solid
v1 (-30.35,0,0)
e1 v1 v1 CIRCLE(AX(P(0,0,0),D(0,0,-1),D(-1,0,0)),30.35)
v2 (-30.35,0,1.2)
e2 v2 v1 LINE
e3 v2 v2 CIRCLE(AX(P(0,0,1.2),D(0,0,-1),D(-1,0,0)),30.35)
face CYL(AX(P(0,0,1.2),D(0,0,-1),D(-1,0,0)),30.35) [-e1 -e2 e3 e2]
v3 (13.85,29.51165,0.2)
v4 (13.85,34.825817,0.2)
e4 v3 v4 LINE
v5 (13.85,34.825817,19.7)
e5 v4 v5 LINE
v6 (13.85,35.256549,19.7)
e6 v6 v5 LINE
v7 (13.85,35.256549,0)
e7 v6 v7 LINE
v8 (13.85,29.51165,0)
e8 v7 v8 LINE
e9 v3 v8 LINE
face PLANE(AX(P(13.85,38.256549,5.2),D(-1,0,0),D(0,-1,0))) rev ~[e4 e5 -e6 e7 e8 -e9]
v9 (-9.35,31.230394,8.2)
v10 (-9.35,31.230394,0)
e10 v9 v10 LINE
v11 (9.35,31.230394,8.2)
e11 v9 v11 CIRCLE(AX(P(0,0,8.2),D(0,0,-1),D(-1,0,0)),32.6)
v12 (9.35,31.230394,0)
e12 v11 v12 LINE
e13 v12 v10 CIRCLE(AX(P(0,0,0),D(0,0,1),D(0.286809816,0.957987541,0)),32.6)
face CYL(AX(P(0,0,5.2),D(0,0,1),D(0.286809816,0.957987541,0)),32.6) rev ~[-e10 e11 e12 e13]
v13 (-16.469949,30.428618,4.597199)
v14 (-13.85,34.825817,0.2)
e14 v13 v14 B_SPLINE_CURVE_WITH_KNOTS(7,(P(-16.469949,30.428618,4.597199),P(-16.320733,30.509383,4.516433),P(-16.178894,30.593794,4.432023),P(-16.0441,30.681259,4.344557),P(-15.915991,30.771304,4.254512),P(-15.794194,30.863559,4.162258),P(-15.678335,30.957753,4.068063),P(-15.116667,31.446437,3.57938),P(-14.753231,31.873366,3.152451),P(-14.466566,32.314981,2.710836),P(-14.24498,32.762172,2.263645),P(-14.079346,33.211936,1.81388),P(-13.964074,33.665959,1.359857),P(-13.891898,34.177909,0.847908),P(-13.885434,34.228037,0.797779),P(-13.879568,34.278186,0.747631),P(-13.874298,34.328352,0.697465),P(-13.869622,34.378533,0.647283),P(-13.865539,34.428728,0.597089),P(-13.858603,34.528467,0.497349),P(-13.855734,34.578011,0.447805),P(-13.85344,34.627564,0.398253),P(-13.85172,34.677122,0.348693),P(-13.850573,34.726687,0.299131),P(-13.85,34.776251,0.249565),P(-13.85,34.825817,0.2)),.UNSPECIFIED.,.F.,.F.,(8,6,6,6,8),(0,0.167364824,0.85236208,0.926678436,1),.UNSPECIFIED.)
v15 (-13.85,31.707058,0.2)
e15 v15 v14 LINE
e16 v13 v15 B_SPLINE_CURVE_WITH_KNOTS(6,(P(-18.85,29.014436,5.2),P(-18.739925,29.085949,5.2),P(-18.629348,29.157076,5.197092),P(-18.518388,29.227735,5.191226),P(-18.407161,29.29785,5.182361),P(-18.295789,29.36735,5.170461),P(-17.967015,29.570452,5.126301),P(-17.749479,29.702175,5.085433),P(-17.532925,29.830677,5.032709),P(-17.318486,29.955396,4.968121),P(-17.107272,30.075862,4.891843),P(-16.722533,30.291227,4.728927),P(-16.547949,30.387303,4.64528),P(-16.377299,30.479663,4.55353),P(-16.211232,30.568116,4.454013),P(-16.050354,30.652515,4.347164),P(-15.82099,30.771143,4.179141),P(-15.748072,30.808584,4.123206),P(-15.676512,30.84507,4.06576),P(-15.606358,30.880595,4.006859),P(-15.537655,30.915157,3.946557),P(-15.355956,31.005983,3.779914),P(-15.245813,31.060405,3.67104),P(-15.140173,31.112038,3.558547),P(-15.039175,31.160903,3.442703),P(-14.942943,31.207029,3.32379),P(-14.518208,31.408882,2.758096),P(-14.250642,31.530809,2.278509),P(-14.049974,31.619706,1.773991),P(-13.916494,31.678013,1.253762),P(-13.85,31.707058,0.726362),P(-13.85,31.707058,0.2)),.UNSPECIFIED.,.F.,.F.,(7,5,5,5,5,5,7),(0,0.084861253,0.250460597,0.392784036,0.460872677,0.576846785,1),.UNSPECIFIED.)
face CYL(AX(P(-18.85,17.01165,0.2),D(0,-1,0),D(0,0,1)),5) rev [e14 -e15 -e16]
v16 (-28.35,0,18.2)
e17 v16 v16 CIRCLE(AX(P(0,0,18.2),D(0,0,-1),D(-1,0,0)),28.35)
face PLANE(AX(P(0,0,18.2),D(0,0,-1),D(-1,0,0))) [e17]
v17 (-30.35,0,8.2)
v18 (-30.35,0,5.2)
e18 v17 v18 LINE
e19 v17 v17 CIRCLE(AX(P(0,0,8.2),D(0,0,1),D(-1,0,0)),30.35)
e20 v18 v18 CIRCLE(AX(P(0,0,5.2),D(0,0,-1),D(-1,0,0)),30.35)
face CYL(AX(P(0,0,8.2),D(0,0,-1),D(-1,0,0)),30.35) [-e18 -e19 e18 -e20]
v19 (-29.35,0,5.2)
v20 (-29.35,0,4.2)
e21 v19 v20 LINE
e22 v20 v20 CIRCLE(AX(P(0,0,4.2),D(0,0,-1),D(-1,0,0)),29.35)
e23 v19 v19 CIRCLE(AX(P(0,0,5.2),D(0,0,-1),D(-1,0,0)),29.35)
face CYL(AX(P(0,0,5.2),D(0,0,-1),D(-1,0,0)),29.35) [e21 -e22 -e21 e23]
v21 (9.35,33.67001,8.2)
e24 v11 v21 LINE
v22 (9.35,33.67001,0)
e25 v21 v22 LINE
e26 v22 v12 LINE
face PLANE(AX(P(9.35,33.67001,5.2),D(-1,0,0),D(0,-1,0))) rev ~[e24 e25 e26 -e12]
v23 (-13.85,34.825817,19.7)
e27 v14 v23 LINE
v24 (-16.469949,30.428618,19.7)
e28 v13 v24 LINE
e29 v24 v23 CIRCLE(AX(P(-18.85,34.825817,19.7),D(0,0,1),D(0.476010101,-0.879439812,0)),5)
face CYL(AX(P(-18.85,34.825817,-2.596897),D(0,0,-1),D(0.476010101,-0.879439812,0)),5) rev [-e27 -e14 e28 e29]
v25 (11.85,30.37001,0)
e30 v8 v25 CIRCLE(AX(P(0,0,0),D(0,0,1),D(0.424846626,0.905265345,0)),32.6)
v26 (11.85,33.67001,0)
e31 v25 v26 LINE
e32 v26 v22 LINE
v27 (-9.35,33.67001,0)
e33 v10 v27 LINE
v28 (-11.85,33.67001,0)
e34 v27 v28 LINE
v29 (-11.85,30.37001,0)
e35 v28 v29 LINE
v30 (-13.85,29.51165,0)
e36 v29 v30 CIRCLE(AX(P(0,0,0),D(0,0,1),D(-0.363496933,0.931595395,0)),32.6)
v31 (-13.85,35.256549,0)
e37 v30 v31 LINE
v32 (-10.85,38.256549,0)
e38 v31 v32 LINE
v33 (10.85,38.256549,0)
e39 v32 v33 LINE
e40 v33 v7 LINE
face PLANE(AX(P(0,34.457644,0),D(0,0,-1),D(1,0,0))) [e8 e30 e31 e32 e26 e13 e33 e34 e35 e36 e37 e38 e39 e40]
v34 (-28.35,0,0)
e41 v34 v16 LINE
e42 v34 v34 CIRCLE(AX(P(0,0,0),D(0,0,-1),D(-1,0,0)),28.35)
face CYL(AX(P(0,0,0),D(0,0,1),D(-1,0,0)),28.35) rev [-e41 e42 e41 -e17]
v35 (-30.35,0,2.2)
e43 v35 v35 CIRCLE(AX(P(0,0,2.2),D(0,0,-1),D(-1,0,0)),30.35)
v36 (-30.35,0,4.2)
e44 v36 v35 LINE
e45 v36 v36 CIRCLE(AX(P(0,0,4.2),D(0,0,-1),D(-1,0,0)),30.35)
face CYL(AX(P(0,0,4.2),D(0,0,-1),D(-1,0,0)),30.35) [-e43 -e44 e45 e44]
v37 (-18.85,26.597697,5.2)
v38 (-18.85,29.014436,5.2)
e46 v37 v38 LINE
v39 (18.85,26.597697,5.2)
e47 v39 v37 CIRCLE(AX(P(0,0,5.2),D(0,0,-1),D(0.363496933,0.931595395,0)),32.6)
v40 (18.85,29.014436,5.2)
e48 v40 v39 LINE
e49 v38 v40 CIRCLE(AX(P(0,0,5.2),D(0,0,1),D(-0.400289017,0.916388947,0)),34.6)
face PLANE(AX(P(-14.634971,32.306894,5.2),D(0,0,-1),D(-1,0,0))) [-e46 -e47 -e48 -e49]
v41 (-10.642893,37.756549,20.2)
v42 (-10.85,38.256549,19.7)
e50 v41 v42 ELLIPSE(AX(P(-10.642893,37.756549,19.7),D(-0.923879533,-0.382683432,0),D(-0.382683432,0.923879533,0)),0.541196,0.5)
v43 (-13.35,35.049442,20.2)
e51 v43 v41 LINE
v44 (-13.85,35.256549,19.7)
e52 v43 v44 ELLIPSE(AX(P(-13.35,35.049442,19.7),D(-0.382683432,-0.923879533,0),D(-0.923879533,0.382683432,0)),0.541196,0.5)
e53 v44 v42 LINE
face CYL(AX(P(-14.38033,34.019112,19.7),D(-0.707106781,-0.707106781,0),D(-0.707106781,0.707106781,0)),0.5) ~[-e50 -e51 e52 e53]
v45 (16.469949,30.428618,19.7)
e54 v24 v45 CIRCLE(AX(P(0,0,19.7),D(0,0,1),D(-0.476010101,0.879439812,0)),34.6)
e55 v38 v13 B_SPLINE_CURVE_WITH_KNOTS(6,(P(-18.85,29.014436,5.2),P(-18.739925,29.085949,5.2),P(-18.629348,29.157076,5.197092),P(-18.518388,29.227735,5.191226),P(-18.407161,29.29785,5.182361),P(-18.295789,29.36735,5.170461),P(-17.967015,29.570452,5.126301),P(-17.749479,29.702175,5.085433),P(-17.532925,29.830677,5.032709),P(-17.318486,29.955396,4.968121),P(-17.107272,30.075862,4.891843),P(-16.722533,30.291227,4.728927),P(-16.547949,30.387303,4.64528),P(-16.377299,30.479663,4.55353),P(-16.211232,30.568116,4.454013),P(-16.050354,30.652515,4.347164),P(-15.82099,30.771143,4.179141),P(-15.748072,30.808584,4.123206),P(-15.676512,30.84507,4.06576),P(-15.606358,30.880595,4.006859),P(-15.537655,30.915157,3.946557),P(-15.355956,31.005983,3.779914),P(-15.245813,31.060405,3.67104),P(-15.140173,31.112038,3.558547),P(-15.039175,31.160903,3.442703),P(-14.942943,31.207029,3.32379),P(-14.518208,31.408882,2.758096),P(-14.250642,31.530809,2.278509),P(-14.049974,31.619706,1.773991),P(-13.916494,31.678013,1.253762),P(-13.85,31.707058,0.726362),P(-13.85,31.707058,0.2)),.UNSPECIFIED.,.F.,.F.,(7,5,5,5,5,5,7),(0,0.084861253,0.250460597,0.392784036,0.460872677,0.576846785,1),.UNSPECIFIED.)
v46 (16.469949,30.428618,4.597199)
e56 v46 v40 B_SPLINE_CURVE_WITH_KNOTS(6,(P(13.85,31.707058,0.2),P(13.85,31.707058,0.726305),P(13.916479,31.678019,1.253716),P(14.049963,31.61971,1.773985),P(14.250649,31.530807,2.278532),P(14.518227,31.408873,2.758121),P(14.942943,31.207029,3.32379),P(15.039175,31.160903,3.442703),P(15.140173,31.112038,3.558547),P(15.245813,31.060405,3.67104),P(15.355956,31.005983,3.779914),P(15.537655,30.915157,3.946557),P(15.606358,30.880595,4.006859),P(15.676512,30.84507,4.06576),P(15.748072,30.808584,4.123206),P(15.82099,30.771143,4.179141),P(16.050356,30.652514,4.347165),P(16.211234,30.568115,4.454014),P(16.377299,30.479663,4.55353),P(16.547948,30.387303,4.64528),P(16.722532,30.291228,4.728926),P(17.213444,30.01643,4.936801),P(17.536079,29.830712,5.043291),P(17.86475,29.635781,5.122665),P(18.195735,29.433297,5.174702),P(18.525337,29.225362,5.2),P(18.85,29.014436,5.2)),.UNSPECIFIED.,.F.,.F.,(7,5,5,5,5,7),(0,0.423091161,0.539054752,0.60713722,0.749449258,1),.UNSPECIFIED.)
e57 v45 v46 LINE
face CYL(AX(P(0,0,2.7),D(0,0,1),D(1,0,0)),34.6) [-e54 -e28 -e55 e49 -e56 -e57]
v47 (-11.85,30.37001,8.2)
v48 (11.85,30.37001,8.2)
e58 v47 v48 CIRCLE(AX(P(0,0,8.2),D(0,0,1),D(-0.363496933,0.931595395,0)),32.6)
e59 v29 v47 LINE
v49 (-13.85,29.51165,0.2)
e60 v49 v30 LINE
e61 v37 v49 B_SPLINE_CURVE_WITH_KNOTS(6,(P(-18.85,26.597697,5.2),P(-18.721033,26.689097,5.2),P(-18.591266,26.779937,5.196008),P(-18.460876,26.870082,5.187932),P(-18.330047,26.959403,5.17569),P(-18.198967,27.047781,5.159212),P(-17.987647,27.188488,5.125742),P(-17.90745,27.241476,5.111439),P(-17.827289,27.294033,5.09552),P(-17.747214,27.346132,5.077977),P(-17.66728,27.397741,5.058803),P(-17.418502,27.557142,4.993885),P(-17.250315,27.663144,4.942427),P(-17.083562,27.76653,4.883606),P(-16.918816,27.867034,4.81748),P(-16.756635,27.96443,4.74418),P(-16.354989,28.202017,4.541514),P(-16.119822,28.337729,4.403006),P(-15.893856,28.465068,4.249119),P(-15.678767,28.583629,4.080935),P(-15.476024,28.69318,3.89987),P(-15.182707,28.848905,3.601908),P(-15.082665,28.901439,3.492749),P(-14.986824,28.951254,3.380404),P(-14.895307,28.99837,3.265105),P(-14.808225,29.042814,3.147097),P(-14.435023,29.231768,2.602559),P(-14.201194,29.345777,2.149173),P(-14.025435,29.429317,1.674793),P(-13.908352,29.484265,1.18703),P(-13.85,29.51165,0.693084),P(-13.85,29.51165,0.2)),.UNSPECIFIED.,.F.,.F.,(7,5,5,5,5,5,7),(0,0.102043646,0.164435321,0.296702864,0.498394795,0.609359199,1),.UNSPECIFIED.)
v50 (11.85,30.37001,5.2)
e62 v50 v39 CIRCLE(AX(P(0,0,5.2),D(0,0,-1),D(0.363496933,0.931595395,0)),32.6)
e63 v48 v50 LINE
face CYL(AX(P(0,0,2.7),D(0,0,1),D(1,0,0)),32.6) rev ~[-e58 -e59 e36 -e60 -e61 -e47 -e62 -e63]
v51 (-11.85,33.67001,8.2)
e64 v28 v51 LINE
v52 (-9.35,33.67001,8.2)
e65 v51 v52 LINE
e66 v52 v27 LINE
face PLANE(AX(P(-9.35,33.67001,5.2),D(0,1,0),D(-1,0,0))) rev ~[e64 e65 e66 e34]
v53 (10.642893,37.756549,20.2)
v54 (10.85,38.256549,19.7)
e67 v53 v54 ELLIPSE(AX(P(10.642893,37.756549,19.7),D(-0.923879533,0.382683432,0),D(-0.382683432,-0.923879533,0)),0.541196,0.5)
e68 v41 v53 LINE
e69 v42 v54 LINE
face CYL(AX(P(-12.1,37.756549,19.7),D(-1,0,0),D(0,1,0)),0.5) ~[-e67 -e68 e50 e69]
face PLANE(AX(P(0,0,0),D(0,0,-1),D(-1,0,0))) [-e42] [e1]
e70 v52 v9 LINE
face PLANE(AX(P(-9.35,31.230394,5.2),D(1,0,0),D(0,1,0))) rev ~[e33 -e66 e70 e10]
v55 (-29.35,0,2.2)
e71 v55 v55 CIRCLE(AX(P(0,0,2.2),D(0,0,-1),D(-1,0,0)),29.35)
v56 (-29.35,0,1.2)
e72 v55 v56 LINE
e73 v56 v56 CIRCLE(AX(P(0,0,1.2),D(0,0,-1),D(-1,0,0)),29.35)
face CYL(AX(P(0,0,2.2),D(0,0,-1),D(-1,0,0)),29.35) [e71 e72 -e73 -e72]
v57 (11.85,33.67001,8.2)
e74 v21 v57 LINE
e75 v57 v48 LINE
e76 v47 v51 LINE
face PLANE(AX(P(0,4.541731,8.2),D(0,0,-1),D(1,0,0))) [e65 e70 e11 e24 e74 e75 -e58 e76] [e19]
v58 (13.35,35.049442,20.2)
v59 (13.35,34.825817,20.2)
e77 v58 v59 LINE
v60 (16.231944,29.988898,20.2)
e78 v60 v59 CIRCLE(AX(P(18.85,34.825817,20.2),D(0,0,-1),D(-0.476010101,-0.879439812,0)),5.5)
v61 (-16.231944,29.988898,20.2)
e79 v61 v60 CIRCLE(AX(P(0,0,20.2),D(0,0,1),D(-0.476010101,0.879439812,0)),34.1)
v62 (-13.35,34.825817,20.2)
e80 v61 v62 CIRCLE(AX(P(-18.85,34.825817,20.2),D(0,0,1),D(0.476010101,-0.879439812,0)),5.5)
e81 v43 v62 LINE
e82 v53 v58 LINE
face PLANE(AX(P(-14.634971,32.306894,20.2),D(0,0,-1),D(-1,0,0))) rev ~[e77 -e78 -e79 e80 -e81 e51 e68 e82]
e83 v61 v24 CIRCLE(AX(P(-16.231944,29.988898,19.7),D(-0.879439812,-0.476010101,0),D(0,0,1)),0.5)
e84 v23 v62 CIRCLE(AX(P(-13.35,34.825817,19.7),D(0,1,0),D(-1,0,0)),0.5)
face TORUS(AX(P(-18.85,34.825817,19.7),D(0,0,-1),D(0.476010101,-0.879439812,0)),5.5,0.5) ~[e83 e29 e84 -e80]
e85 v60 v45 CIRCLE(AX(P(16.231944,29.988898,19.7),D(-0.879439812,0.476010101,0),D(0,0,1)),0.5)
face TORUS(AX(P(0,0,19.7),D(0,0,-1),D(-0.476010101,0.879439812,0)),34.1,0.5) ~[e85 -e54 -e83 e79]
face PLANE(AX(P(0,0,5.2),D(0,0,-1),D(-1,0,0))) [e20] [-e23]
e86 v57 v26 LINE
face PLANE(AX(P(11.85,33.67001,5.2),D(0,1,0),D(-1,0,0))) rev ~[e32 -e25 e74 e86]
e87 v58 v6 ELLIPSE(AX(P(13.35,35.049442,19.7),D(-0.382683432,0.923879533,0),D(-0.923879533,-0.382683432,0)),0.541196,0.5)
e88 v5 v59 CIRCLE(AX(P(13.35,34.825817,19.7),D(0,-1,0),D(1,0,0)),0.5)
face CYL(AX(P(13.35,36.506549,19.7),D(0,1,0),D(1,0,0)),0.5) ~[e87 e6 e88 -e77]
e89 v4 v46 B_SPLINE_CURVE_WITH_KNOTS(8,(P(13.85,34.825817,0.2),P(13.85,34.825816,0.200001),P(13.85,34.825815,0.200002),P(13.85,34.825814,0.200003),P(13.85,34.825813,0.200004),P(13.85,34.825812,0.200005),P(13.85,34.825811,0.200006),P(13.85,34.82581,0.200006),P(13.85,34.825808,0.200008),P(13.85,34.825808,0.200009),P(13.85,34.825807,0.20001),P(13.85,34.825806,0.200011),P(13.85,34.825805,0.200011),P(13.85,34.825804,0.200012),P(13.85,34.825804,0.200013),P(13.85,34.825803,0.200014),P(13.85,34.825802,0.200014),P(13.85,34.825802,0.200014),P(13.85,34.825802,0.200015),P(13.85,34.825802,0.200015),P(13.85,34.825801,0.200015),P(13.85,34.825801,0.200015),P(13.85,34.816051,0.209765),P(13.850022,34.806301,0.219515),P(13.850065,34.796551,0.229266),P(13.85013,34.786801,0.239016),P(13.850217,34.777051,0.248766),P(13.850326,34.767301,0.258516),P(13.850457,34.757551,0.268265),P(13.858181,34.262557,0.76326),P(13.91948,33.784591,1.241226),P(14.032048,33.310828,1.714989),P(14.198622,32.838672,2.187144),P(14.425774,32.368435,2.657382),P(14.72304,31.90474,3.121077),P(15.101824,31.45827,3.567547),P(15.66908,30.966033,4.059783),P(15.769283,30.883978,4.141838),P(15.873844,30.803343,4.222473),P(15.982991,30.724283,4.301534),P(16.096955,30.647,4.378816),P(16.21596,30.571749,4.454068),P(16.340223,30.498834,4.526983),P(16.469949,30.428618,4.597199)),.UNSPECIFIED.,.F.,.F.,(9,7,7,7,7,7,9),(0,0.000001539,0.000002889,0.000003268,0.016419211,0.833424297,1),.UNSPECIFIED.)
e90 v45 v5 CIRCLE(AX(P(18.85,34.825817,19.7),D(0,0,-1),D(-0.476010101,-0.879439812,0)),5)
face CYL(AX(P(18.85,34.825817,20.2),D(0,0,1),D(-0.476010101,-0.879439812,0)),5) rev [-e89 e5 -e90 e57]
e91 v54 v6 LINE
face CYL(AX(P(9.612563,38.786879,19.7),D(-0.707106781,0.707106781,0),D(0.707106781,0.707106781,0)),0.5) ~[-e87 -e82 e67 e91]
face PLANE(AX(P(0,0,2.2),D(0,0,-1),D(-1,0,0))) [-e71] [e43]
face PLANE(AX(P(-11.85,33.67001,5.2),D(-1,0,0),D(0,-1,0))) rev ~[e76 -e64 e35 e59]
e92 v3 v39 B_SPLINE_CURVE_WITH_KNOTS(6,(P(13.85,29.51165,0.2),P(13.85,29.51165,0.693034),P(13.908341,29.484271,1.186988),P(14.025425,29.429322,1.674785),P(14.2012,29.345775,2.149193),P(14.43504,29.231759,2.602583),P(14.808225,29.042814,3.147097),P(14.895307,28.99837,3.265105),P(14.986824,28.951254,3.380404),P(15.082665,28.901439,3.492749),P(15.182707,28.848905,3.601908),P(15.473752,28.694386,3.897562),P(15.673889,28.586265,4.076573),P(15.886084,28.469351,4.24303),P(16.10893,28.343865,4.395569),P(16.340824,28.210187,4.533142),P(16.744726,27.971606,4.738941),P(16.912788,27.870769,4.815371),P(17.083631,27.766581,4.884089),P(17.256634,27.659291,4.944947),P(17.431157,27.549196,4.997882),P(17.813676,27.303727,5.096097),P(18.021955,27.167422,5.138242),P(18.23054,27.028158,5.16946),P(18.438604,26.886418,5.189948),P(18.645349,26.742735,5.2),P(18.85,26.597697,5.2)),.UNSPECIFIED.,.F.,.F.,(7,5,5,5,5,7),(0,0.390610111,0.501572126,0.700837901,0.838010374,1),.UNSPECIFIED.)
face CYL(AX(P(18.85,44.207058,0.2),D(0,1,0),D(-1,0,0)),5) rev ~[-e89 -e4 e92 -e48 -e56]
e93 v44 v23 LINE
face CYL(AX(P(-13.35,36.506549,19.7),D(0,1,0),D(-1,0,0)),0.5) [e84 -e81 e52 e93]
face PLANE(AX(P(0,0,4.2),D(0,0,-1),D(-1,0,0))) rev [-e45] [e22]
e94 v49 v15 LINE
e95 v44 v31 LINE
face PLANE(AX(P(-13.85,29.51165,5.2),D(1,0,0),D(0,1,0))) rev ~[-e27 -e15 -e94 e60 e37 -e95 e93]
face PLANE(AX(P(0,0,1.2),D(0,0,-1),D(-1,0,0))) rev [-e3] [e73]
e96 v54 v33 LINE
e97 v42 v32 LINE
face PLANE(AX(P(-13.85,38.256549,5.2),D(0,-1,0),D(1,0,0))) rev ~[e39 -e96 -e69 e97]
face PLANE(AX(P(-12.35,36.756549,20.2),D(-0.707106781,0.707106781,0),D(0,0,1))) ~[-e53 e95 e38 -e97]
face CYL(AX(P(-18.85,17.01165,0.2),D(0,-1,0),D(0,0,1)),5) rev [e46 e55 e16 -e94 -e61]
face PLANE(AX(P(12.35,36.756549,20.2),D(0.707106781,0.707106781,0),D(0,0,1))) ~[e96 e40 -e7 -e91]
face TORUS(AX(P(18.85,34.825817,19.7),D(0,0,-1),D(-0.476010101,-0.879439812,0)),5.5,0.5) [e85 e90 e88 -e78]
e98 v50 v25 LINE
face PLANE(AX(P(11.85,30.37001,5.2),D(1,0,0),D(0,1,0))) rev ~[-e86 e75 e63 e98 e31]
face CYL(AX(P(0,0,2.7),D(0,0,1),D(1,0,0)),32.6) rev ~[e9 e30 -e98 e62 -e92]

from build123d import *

# Parameters (mm, degrees)
F3_DEPTH      = 15
F4_R          = 30.35
F5_DEPTH      = 12
F8_DEPTH      = 5.2
F9_T1_DEPTH   = 15
F9_T6_DEPTH   = 27.1954073321
F9_S7_R       = 32.6
F9_T8_DEPTH   = 16
F9_S9_R       = 34.6
F9_T10_DEPTH  = 16
F9_T14_DEPTH  = 27.1954073321
F9_S15_R      = 32.6
F9_T16_DEPTH  = 16
F9_S17_R      = 34.6
F9_T18_DEPTH  = 16
F9_T23_DEPTH  = 27.1954073321
F9_S24_R      = 34.6
F9_T25_DEPTH  = 16
F9_T29_DEPTH  = 22.7968974984
F9_T37_DEPTH  = 27.1954073321
F9_S39_R      = 34.6
F9_T40_DEPTH  = 16
F9_T43_DEPTH  = 22.7968974984
F10_SIZE      = 3
F11_T1_DEPTH  = 24.2
F11_T3_DEPTH  = 6.7426406871
F11_T5_DEPTH  = 6.7426406871
F11_T7_DEPTH  = 1.6807325889
F11_T10_ANGLE = 303.1497240065
F11_T12_ANGLE = 61.5748620049
F11_T14_ANGLE = 61.5748620049


# Not quite as in the source:
# - a fillet or chamfer that OpenCascade refuses, or shapes differently, is made with other operations: its cross-section is extruded or revolved along the edge and cut away or added


with BuildPart() as f1:
    # F0 (on Front) → F1 (revolve)
    with BuildSketch(Plane.XZ):
        Polygon((-30.35, 1.2), (-30.35, 0), (-28.35, 0), (-28.35, 18.2), (0, 18.2), (0, 20.2), (-30.35, 20.2), (-32.6, 20.2), (-32.6, 8.2), (-30.35, 8.2), (-30.35, 5.2), (-29.35, 5.2), (-29.35, 4.2), (-30.35, 4.2), (-30.35, 2.2), (-29.35, 2.2), (-29.35, 1.2), align=None)
    revolve(axis=Axis((0, 0, 19.2), (0, 0, -1)))

    # F2 (on face) → F3 (join)
    with BuildSketch(Plane.XY.offset(20.2)):
        with BuildLine():
            Line((-13.85, 38.2565491622), (-13.85, 31.707057574))
            ThreePointArc((-13.85, 31.707057574), (0, -34.6), (13.85, 31.707057574))
            Line((13.85, 31.707057574), (13.85, 38.2565491622))
            Line((13.85, 38.2565491622), (-13.85, 38.2565491622))
        make_face()
        with BuildLine():
            ThreePointArc((11.85, 30.3700098782), (0, -32.6), (-11.85, 30.3700098782))
            Line((-11.85, 30.3700098782), (-11.85, 33.6700098782))
            Line((-11.85, 33.6700098782), (-9.35, 33.6700098782))
            Line((-9.35, 33.6700098782), (-9.35, 31.2303938496))
            ThreePointArc((-9.35, 31.2303938496), (0, 32.6), (9.35, 31.2303938496))
            Line((9.35, 31.2303938496), (9.35, 33.6700098782))
            Line((9.35, 33.6700098782), (11.85, 33.6700098782))
            Line((11.85, 33.6700098782), (11.85, 30.3700098782))
        make_face(mode=Mode.SUBTRACT)
    extrude(amount=-F3_DEPTH)

    # F4 (on face) → F5 (join)
    with BuildSketch(Plane(origin=(0, 0, 8.2), x_dir=(1, 0, 0), z_dir=(0, 0, -1))):
        with BuildLine():
            ThreePointArc((13.85, -31.707057574), (0, 34.6), (-13.85, -31.707057574))
            Line((-13.85, -31.707057574), (-13.85, -38.2565491622))
            Line((-13.85, -38.2565491622), (13.85, -38.2565491622))
            Line((13.85, -38.2565491622), (13.85, -31.707057574))
        make_face()
        Circle(F4_R, mode=Mode.SUBTRACT)
    extrude(amount=-F5_DEPTH)

    # F7 (on face) → F8 (join, through all)
    with BuildSketch(Plane(origin=(0, 0, 5.2), x_dir=(1, 0, 0), z_dir=(0, 0, -1))):
        with BuildLine():
            Line((-13.85, -29.5116502419), (-13.85, -38.2565491622))
            Line((-13.85, -38.2565491622), (13.85, -38.2565491622))
            Line((13.85, -38.2565491622), (13.85, -29.5116502419))
            ThreePointArc((13.85, -29.5116502419), (12.8571651353, -29.9575250093), (11.85, -30.3700098782))
            Line((11.85, -30.3700098782), (11.85, -33.6700098782))
            Line((11.85, -33.6700098782), (9.35, -33.6700098782))
            Line((9.35, -33.6700098782), (9.35, -31.2303938496))
            ThreePointArc((9.35, -31.2303938496), (0, -32.6), (-9.35, -31.2303938496))
            Line((-9.35, -31.2303938496), (-9.35, -33.6700098782))
            Line((-9.35, -33.6700098782), (-11.85, -33.6700098782))
            Line((-11.85, -33.6700098782), (-11.85, -30.3700098782))
            ThreePointArc((-11.85, -30.3700098782), (-12.8571651353, -29.9575250093), (-13.85, -29.5116502419))
        make_face()
    extrude(amount=F8_DEPTH)

    # F9: fillet of radius 5 on 4 edges, made by hand

    # F9_s2 → F9_t1 (join)
    with BuildSketch(Plane.XY.offset(5.2)):
        with BuildLine():
            ThreePointArc((-16.4699494949, 30.4286175111), (-14.5546389834, 32.2665444625), (-13.85, 34.8258165733))
            Line((-13.85, 34.8258165733), (-13.85, 31.707057574))
            ThreePointArc((-13.85, 31.707057574), (-15.1734451129, 31.0954428077), (-16.4699494949, 30.4286175111))
        make_face()
        with BuildLine():
            ThreePointArc((16.4699494949, 30.4286175111), (14.5546389834, 32.2665444625), (13.85, 34.8258165733))
            Line((13.85, 34.8258165733), (13.85, 31.707057574))
            ThreePointArc((13.85, 31.707057574), (15.1734451129, 31.0954428077), (16.4699494949, 30.4286175111))
        make_face()
    extrude(amount=F9_T1_DEPTH)


with BuildPart() as f9_tool4:
    # F9_s5 → F9_t6 (new body)
    with BuildSketch(Plane.XZ.offset(-44.207057574)):
        with BuildLine():
            ThreePointArc((13.85, 0.2), (15.3144660941, 3.7355339059), (18.85, 5.2))
            Line((18.85, 5.2), (13.85, 5.2))
            Line((13.85, 5.2), (13.85, 0.2))
        make_face()
    extrude(amount=F9_T6_DEPTH)

    # F9_s7 → F9_t8 (cut, symmetric)
    with BuildSketch(Plane.XY.offset(2.7)):
        Circle(F9_S7_R)
    extrude(amount=F9_T8_DEPTH, both=True, mode=Mode.SUBTRACT)

    # F9_s9 → F9_t10 (intersect, symmetric)
    with BuildSketch(Plane.XY.offset(2.7)):
        Circle(F9_S9_R)
    extrude(amount=F9_T10_DEPTH, both=True, mode=Mode.INTERSECT)


with BuildPart() as f1_1:
    add(f1.part)

    # F9_t3: union F9_tool4
    add(f9_tool4.part)


with BuildPart() as f9_tool12:
    # F9_s13 → F9_t14 (new body)
    with BuildSketch(Plane.XZ.offset(-17.0116502419)):
        with BuildLine():
            ThreePointArc((-18.85, 5.2), (-15.3144660941, 3.7355339059), (-13.85, 0.2))
            Line((-13.85, 0.2), (-13.85, 5.2))
            Line((-13.85, 5.2), (-18.85, 5.2))
        make_face()
    extrude(amount=-F9_T14_DEPTH)

    # F9_s15 → F9_t16 (cut, symmetric)
    with BuildSketch(Plane.XY.offset(2.7)):
        Circle(F9_S15_R)
    extrude(amount=F9_T16_DEPTH, both=True, mode=Mode.SUBTRACT)

    # F9_s17 → F9_t18 (intersect, symmetric)
    with BuildSketch(Plane.XY.offset(2.7)):
        Circle(F9_S17_R)
    extrude(amount=F9_T18_DEPTH, both=True, mode=Mode.INTERSECT)


with BuildPart() as f1_2:
    add(f1_1.part)

    # F9_t11: union F9_tool12
    add(f9_tool12.part)


with BuildPart() as f9_tool21:
    # F9_s22 → F9_t23 (new body)
    with BuildSketch(Plane.XZ.offset(-17.0116502419)):
        with BuildLine():
            ThreePointArc((-18.85, 5.2), (-15.3144660941, 3.7355339059), (-13.85, 0.2))
            Line((-13.85, 0.2), (-13.85, 5.2))
            Line((-13.85, 5.2), (-18.85, 5.2))
        make_face()
    extrude(amount=-F9_T23_DEPTH)

    # F9_s24 → F9_t25 (cut, symmetric)
    with BuildSketch(Plane.XY.offset(2.7)):
        Circle(F9_S24_R)
    extrude(amount=F9_T25_DEPTH, both=True, mode=Mode.SUBTRACT)

    split(bisect_by=Plane.XZ.offset(-38.2565491622), keep=Keep.TOP)


with BuildPart() as f9_tool27:
    # F9_s28 → F9_t29 (new body)
    with BuildSketch(Plane.XY.offset(-2.5968974984)):
        with BuildLine():
            ThreePointArc((-16.4699494949, 30.4286175111), (-14.5546389834, 32.2665444625), (-13.85, 34.8258165733))
            Line((-13.85, 34.8258165733), (-13.85, 31.707057574))
            ThreePointArc((-13.85, 31.707057574), (-15.1734451129, 31.0954428077), (-16.4699494949, 30.4286175111))
        make_face()
    extrude(amount=F9_T29_DEPTH)

    split(bisect_by=Plane.XY, keep=Keep.TOP)

    split(bisect_by=Plane.XY.offset(5.2), keep=Keep.BOTTOM)


with BuildPart() as f9_tool21_1:
    add(f9_tool21.part)

    # F9_t32: intersect F9_tool27
    add(f9_tool27.part, mode=Mode.INTERSECT)


with BuildPart() as f1_3:
    add(f1_2.part)

    # F9_t19: union F9_tool21
    add(f9_tool21_1.part)


with BuildPart() as f9_tool35:
    # F9_s36 → F9_t37 (new body)
    with BuildSketch(Plane.XZ.offset(-44.207057574)):
        with BuildLine():
            ThreePointArc((13.85, 0.2), (15.3144660941, 3.7355339059), (18.85, 5.2))
            Line((18.85, 5.2), (13.85, 5.2))
            Line((13.85, 5.2), (13.85, 0.2))
        make_face()
    extrude(amount=F9_T37_DEPTH)

    split(bisect_by=Plane.XZ.offset(-38.2565491622), keep=Keep.TOP)

    # F9_s39 → F9_t40 (cut, symmetric)
    with BuildSketch(Plane.XY.offset(2.7)):
        Circle(F9_S39_R)
    extrude(amount=F9_T40_DEPTH, both=True, mode=Mode.SUBTRACT)


with BuildPart() as f9_tool41:
    # F9_s42 → F9_t43 (new body)
    with BuildSketch(Plane.XY.offset(20.2)):
        with BuildLine():
            ThreePointArc((16.4699494949, 30.4286175111), (14.5546389834, 32.2665444625), (13.85, 34.8258165733))
            Line((13.85, 34.8258165733), (13.85, 31.707057574))
            ThreePointArc((13.85, 31.707057574), (15.1734451129, 31.0954428077), (16.4699494949, 30.4286175111))
        make_face()
    extrude(amount=-F9_T43_DEPTH)

    split(bisect_by=Plane.XY, keep=Keep.TOP)

    split(bisect_by=Plane.XY.offset(5.2), keep=Keep.BOTTOM)


with BuildPart() as f9_tool35_1:
    add(f9_tool35.part)

    # F9_t46: intersect F9_tool41
    add(f9_tool41.part, mode=Mode.INTERSECT)


with BuildPart() as f1_4:
    add(f1_3.part)

    # F9_t33: union F9_tool35
    add(f9_tool35_1.part)

    # F10
    f10_edges = [f1_4.edges().sort_by_distance(p)[0] for p in [
        (13.85, 38.256549, 12.7),
        (13.85, 38.256549, 2.6),
        (-13.85, 38.256549, 12.7),
        (-13.85, 38.256549, 2.6),
    ]]
    chamfer(f10_edges, length=F10_SIZE)

    # F11: fillet of radius 0.5 on 8 edges, made by hand

    # F11_s2 → F11_t1 (cut)
    with BuildSketch(Plane.YZ.offset(-12.1)):
        with BuildLine():
            ThreePointArc((38.2565491622, 19.7), (38.1101025528, 20.0535533906), (37.7565491622, 20.2))
            Line((37.7565491622, 20.2), (38.2565491622, 20.2))
            Line((38.2565491622, 20.2), (38.2565491622, 19.7))
        make_face()
    extrude(amount=F11_T1_DEPTH, mode=Mode.SUBTRACT)

    # F11_s4 → F11_t3 (cut)
    with BuildSketch(Plane(origin=(9.8193911046, 9.8193911046, 0), x_dir=(0, 0, 1), z_dir=(0.7071067812, 0.7071067812, 0))):
        with BuildLine():
            ThreePointArc((19.7, -34.7235739133), (20.0535533906, -34.5771273039), (20.2, -34.2235739133))
            Line((20.2, -34.2235739133), (20.2, -34.7235739133))
            Line((20.2, -34.7235739133), (19.7, -34.7235739133))
        make_face()
    extrude(amount=F11_T3_DEPTH, mode=Mode.SUBTRACT)

    # F11_s6 → F11_t5 (cut)
    with BuildSketch(Plane(origin=(-14.5871580576, 14.5871580576, 0), x_dir=(0, 0, 1), z_dir=(0.7071067812, -0.7071067812, 0))):
        with BuildLine():
            ThreePointArc((19.7, -34.7235739133), (20.0535533906, -34.5771273039), (20.2, -34.2235739133))
            Line((20.2, -34.2235739133), (20.2, -34.7235739133))
            Line((20.2, -34.7235739133), (19.7, -34.7235739133))
        make_face()
    extrude(amount=F11_T5_DEPTH, mode=Mode.SUBTRACT)

    # F11_s8 → F11_t7 (cut)
    with BuildSketch(Plane.XZ.offset(-36.5065491622)):
        with BuildLine():
            ThreePointArc((-13.85, 19.7), (-13.7035533906, 20.0535533906), (-13.35, 20.2))
            Line((-13.35, 20.2), (-13.85, 20.2))
            Line((-13.85, 20.2), (-13.85, 19.7))
        make_face()
        with BuildLine():
            ThreePointArc((13.85, 19.7), (13.7035533906, 20.0535533906), (13.35, 20.2))
            Line((13.35, 20.2), (13.85, 20.2))
            Line((13.85, 20.2), (13.85, 19.7))
        make_face()
    extrude(amount=F11_T7_DEPTH, mode=Mode.SUBTRACT)

    # F11_s9 → F11_t10 (revolve, cut)
    with BuildSketch(Plane(origin=(0, 0, 0), x_dir=(0, 0, 1), z_dir=(0.8794398125, 0.476010101, 0))):
        with BuildLine():
            ThreePointArc((20.2, -34.1), (20.0535533906, -34.4535533906), (19.7, -34.6))
            Line((19.7, -34.6), (20.2, -34.6))
            Line((20.2, -34.6), (20.2, -34.1))
        make_face()
    revolve(axis=Axis((0, 0, 20.2), (0, 0, 1)), revolution_arc=F11_T10_ANGLE, mode=Mode.SUBTRACT)

    # F11_s11 → F11_t12 (revolve, cut)
    with BuildSketch(Plane(origin=(-4e-10, -2e-10, 0), x_dir=(0, 0, 1), z_dir=(-0.8794398125, -0.476010101, 0))):
        with BuildLine():
            ThreePointArc((19.7, 34.6), (20.0535533906, 34.4535533906), (20.2, 34.1))
            Line((20.2, 34.1), (20.2, 34.6))
            Line((20.2, 34.6), (19.7, 34.6))
        make_face()
    revolve(axis=Axis((-18.8499999998, 34.8258165732, 20.2), (0, 0, 1)), revolution_arc=F11_T12_ANGLE, mode=Mode.SUBTRACT)

    # F11_s13 → F11_t14 (revolve, cut)
    with BuildSketch(Plane(origin=(4e-10, -2e-10, 0), x_dir=(0, 0, 1), z_dir=(0.8794398125, -0.476010101, 0))):
        with BuildLine():
            ThreePointArc((19.7, -34.6), (20.0535533906, -34.4535533906), (20.2, -34.1))
            Line((20.2, -34.1), (20.2, -34.6))
            Line((20.2, -34.6), (19.7, -34.6))
        make_face()
    revolve(axis=Axis((18.8499999998, 34.8258165732, 20.2), (0, 0, -1)), revolution_arc=F11_T14_ANGLE, mode=Mode.SUBTRACT)


solid = f1_4.part
